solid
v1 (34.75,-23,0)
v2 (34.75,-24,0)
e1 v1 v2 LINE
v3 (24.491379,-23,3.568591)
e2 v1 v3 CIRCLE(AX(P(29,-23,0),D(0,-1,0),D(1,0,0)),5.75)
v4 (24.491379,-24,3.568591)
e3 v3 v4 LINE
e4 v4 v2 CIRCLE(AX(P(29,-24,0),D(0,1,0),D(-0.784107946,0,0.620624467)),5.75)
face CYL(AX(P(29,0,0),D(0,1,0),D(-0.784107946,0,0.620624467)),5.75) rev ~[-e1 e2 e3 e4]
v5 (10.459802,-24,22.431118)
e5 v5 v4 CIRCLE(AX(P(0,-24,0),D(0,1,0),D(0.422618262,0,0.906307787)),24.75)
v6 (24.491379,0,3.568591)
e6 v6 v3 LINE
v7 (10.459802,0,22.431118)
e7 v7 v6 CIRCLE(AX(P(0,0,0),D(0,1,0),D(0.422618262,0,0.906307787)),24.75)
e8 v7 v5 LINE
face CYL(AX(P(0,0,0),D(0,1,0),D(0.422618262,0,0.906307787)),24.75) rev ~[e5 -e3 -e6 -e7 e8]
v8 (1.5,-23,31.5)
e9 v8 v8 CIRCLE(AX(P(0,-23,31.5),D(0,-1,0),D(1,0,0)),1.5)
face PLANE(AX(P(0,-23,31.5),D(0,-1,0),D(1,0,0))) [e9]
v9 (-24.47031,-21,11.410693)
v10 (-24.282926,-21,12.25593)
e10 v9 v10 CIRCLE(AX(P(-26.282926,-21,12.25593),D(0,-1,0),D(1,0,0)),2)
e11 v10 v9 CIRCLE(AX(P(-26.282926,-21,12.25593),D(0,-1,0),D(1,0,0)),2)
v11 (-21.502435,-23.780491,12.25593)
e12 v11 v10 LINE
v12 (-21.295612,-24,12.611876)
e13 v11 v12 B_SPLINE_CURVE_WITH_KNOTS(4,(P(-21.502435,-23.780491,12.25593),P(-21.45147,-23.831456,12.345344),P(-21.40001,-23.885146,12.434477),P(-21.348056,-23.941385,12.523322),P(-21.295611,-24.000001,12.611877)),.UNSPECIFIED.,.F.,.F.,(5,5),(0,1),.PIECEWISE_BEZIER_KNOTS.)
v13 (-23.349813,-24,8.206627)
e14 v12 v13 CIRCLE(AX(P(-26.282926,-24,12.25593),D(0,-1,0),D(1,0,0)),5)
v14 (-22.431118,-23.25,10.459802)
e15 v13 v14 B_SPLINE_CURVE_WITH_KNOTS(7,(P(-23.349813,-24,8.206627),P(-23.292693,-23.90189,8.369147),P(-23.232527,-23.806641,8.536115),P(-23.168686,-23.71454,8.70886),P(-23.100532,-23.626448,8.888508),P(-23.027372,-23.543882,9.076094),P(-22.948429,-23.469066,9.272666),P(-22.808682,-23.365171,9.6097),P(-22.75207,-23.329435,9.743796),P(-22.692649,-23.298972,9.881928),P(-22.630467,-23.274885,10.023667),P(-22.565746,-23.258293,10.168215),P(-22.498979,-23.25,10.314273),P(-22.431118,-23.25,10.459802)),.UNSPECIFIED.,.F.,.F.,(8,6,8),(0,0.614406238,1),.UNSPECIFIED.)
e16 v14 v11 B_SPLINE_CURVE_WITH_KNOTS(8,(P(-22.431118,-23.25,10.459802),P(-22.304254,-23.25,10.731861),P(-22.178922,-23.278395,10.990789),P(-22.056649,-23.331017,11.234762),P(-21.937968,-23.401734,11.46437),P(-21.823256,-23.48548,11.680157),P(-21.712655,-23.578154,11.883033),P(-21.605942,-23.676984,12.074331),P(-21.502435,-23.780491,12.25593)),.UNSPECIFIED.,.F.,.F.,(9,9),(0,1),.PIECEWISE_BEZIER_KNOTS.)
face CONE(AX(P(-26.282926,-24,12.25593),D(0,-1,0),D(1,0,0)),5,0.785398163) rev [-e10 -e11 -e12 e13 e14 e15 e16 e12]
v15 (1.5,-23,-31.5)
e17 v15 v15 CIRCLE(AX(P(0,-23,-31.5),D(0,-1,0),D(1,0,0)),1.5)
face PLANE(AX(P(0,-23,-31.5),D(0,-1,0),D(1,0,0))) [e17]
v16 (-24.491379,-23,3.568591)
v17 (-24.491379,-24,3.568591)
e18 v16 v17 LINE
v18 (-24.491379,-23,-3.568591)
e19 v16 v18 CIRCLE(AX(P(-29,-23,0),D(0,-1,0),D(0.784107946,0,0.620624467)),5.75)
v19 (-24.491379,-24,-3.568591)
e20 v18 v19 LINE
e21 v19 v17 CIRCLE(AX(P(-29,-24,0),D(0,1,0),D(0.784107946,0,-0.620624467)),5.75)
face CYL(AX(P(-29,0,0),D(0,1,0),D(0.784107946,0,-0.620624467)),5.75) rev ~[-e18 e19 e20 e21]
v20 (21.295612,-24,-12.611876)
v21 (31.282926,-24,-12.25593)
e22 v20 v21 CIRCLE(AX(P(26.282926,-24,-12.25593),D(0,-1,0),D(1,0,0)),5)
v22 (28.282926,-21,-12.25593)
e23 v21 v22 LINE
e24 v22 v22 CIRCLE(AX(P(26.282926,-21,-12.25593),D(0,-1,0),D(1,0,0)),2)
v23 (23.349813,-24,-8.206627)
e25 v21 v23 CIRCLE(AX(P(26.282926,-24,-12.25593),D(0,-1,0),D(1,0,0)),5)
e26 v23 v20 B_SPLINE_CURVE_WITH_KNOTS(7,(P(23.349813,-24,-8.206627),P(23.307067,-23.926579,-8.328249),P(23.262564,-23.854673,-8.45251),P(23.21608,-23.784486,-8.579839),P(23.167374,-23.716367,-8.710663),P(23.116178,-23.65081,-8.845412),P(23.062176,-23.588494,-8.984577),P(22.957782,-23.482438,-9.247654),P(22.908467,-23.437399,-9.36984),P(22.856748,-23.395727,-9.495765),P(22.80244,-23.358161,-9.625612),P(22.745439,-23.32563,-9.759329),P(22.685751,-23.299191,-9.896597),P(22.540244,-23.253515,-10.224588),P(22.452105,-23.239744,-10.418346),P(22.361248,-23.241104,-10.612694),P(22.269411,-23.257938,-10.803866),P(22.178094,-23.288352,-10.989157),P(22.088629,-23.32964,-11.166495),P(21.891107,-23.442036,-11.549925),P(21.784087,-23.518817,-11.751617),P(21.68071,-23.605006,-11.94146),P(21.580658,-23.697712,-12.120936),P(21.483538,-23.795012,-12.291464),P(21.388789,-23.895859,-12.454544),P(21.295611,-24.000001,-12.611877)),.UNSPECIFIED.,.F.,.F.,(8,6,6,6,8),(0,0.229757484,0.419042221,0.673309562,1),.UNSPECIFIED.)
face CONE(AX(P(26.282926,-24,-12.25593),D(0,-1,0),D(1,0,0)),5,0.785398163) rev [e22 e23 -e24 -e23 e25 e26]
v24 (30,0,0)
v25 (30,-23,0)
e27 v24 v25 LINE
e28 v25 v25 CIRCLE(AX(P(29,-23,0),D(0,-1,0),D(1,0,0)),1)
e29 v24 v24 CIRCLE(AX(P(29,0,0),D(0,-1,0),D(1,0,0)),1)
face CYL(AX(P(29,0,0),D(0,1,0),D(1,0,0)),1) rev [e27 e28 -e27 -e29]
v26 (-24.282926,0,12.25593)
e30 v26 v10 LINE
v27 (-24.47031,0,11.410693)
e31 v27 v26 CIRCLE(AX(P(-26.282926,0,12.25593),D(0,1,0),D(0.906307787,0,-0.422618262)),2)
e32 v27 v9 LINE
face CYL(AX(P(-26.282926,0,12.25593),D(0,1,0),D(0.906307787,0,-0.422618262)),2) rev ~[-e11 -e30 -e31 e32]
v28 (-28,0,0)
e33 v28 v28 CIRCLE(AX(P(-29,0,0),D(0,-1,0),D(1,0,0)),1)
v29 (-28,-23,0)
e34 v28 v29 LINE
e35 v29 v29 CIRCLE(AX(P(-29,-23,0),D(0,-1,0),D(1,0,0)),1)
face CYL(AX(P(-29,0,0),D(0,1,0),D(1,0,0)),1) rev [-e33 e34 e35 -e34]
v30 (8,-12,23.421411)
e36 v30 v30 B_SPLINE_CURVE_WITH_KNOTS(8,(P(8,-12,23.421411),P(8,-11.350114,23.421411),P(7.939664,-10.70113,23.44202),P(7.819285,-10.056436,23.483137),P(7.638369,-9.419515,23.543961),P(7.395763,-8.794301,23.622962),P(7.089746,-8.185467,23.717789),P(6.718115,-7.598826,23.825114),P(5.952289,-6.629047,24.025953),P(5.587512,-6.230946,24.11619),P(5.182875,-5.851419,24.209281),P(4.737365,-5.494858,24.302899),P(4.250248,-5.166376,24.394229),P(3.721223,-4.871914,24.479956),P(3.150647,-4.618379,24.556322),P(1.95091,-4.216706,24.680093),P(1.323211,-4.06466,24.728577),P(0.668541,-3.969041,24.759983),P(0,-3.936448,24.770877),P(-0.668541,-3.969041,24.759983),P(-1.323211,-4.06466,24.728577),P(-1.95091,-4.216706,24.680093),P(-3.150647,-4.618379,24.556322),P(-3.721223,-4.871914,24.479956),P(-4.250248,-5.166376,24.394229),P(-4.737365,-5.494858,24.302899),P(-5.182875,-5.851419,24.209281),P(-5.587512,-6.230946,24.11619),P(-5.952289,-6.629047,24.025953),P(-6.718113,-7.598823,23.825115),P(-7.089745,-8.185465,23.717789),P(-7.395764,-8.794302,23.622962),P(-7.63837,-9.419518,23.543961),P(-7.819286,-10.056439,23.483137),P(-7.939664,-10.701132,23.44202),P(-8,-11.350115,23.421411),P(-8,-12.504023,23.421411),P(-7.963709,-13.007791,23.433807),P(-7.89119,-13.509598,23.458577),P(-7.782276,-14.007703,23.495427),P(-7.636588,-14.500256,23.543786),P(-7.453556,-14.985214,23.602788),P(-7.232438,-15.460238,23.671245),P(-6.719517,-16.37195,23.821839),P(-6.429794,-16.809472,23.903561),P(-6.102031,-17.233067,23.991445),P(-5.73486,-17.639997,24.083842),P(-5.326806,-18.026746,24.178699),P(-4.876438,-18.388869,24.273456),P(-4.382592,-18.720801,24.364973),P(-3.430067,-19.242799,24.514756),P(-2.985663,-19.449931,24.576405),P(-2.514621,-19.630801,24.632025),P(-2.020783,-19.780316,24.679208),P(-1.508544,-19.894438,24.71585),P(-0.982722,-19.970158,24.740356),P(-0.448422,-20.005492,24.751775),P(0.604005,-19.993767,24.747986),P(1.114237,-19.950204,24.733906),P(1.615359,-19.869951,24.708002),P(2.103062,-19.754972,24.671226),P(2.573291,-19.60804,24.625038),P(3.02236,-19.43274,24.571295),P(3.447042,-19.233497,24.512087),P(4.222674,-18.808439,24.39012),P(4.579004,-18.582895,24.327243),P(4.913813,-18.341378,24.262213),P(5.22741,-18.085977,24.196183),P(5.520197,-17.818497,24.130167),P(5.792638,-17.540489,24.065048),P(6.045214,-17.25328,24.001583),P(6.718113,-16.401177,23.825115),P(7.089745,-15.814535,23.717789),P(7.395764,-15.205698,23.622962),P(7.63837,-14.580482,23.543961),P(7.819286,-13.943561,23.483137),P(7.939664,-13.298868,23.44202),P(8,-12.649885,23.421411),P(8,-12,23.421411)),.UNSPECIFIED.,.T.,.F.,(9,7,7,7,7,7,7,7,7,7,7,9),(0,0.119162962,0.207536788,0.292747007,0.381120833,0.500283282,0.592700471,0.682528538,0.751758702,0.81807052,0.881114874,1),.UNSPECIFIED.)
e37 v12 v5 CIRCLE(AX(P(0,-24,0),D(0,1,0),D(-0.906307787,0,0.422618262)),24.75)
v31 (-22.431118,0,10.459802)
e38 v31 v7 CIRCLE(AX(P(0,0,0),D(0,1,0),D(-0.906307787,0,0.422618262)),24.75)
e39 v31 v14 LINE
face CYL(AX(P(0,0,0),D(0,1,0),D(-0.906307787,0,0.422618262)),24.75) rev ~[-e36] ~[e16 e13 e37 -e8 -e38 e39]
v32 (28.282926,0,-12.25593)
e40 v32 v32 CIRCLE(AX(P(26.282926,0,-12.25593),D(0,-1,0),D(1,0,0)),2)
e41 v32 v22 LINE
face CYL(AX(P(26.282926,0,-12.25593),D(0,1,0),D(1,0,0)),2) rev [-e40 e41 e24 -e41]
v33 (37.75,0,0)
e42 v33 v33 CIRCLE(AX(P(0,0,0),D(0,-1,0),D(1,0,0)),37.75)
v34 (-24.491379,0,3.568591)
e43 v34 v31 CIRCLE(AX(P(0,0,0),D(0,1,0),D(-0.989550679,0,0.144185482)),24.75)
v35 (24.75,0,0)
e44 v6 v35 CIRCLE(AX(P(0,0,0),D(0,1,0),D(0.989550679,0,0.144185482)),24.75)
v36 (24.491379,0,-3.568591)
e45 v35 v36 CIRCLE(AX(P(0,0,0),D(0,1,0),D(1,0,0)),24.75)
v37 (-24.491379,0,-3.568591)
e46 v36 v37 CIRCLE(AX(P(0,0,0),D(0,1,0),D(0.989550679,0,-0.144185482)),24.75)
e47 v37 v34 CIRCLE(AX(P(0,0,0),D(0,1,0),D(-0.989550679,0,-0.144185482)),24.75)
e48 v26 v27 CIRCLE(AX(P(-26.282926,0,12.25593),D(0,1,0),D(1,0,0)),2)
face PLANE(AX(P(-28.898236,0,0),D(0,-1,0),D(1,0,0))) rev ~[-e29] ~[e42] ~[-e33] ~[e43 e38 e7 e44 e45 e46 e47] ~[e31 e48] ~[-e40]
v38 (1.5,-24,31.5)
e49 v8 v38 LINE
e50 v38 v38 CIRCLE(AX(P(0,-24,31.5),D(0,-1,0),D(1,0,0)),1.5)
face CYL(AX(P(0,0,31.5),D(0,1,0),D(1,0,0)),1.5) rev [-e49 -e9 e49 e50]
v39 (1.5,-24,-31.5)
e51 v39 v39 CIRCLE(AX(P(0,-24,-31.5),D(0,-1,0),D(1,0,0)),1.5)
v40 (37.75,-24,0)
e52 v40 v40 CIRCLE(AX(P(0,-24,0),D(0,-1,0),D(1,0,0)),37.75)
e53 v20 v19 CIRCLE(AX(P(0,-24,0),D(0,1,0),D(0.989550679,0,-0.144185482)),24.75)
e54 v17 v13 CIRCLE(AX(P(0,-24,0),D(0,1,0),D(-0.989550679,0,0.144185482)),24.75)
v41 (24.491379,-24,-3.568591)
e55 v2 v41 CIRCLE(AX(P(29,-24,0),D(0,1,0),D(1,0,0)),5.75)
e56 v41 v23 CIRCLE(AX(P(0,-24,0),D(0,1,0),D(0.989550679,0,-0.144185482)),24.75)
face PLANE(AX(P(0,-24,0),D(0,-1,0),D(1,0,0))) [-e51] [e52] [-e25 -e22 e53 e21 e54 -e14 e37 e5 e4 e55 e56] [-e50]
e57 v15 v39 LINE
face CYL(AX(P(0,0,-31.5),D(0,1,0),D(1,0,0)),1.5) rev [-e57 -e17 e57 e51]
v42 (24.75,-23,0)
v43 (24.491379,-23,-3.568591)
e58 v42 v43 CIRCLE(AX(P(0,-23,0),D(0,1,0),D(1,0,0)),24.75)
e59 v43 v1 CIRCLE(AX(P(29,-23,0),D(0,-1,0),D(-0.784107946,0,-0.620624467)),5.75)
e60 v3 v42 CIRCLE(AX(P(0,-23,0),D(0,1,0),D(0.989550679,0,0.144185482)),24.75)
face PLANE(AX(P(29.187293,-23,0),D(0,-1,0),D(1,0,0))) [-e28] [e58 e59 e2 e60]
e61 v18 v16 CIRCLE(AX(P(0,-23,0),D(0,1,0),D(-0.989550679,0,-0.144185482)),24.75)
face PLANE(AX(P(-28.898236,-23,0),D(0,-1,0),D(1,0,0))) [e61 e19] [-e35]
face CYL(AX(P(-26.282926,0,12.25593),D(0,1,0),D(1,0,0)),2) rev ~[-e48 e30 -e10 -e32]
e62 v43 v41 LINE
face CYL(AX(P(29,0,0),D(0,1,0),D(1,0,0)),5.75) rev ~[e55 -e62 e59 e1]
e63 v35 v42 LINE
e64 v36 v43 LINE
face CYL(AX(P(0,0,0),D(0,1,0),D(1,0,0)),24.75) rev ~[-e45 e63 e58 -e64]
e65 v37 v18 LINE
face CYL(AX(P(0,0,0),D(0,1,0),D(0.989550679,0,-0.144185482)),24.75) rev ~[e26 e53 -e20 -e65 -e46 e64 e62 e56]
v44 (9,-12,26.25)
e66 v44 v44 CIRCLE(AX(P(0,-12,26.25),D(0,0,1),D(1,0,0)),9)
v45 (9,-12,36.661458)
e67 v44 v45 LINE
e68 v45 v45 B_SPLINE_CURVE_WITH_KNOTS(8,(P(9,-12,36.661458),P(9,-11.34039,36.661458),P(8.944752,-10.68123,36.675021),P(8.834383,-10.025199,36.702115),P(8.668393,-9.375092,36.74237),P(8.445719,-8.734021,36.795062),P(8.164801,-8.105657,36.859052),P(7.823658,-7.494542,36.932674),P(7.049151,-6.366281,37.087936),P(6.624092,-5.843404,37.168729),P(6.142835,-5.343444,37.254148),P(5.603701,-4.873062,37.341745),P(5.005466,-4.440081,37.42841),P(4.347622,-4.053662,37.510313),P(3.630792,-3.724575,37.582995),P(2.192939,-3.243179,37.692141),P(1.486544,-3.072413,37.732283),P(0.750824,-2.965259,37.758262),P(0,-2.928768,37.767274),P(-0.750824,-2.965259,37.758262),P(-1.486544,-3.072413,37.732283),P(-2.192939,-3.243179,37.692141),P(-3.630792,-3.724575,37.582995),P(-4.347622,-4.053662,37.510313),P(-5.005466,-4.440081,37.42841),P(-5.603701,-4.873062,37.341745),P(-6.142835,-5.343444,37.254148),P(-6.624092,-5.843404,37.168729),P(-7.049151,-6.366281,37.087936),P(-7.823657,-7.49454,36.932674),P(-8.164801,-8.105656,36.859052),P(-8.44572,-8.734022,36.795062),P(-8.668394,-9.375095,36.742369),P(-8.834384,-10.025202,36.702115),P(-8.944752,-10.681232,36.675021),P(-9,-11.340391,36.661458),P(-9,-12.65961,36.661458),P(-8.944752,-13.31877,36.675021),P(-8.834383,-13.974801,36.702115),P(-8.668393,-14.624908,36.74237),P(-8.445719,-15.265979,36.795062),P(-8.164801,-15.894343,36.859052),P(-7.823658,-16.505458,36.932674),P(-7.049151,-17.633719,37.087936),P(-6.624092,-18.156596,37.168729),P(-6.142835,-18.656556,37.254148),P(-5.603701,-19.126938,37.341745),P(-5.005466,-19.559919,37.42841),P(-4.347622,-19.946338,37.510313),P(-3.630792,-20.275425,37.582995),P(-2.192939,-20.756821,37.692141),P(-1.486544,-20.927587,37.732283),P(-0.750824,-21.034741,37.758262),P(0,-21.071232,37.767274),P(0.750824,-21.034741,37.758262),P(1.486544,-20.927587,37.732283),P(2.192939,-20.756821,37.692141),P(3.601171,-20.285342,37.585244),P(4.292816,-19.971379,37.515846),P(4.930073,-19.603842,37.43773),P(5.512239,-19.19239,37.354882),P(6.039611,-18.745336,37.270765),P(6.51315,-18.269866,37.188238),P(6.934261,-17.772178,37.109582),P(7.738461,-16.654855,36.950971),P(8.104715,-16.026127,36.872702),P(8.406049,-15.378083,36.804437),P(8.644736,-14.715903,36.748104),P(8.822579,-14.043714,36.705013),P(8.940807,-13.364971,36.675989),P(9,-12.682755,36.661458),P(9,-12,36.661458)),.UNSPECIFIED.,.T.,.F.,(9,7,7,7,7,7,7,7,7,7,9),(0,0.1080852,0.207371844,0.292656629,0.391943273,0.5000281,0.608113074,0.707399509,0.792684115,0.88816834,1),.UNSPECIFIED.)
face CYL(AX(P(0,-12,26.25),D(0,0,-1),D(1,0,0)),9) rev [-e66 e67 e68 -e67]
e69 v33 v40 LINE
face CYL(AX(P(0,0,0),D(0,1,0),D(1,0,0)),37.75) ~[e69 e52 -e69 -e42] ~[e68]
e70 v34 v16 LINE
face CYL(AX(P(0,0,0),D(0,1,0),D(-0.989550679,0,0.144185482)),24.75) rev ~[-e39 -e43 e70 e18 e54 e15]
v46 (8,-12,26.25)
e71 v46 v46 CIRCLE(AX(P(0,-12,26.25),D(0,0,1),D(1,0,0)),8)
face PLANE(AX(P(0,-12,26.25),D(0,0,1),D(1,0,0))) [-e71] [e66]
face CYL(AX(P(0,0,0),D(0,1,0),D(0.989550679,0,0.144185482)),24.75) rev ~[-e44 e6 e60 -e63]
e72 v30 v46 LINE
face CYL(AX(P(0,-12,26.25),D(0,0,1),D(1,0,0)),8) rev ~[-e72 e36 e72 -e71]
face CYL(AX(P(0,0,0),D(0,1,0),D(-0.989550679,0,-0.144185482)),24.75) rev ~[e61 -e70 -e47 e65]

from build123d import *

# Parameters (mm, degrees)
F0_R     = 37.75
F0_R_2   = 1.5
F0_R_3   = 2
F1_DEPTH = 24
F0_R_4   = 1
F2_DEPTH = 23
F5_R     = 9
F5_R_2   = 8
F6_DEPTH = 25
F7_DEPTH = 15


# Not quite as in the source:
# - a fillet or chamfer that OpenCascade refuses, or shapes differently, is made with other operations: its cross-section is extruded or revolved along the edge and cut away or added


with BuildPart() as f1:
    # F0 (on Front) → F1 (new body)
    with BuildSketch(Plane.XZ):
        Circle(F0_R)
        with Locations((0, -31.5)):
            Circle(F0_R_2, mode=Mode.SUBTRACT)
        with Locations((26.2829258241, -12.2559295905)):
            Circle(F0_R_3, mode=Mode.SUBTRACT)
        with BuildLine():
            ThreePointArc((-24.2829258241, 12.2559295905), (-24.3303338098, 11.8230503626), (-24.47031025, 11.410693067))
            ThreePointArc((-24.47031025, 11.410693067), (-28.2355178383, 12.6888088184), (-24.2829258241, 12.2559295905))
        make_face(mode=Mode.SUBTRACT)
        with BuildLine():
            ThreePointArc((10.4598019781, 22.4311177292), (19.8581217638, 14.7721867038), (24.4913793103, 3.568590685))
            ThreePointArc((24.4913793103, 3.568590685), (30.8891705898, 5.4307950139), (34.75, 0))
            ThreePointArc((34.75, 0), (30.8891705898, -5.4307950139), (24.4913793103, -3.568590685))
            ThreePointArc((24.4913793103, -3.568590685), (0, -24.75), (-24.4913793103, -3.568590685))
            ThreePointArc((-24.4913793103, -3.568590685), (-34.75, 0), (-24.4913793103, 3.568590685))
            ThreePointArc((-24.4913793103, 3.568590685), (-23.7129158978, 7.0894371866), (-22.4311177292, 10.4598019781))
            ThreePointArc((-22.4311177292, 10.4598019781), (-8.4649985473, 23.2573923645), (10.4598019781, 22.4311177292))
        make_face(mode=Mode.SUBTRACT)
        with Locations((0, 31.5)):
            Circle(F0_R_2, mode=Mode.SUBTRACT)
    extrude(amount=F1_DEPTH)

    # F0 (on Front) → F2 (join)
    with BuildSketch(Plane.XZ):
        with BuildLine():
            ThreePointArc((-24.4913793103, 3.568590685), (-34.75, 0), (-24.4913793103, -3.568590685))
            ThreePointArc((-24.4913793103, -3.568590685), (-24.75, 0), (-24.4913793103, 3.568590685))
        make_face()
        with Locations((-29, 0)):
            Circle(F0_R_4, mode=Mode.SUBTRACT)
        with Locations((0, 31.5)):
            Circle(F0_R_2)
        with BuildLine():
            ThreePointArc((24.4913793103, 3.568590685), (24.6852601559, 1.7889748557), (24.75, 0))
            ThreePointArc((24.75, 0), (24.6852601559, -1.7889748557), (24.4913793103, -3.568590685))
            ThreePointArc((24.4913793103, -3.568590685), (30.8891705898, -5.4307950139), (34.75, 0))
            ThreePointArc((34.75, 0), (30.8891705898, 5.4307950139), (24.4913793103, 3.568590685))
        make_face()
        with Locations((29, 0)):
            Circle(F0_R_4, mode=Mode.SUBTRACT)
        with Locations((0, -31.5)):
            Circle(F0_R_2)
    extrude(amount=F2_DEPTH)

    # F3: chamfer of 3 on 2 edges, made by hand

    # F3_s1 → F3_t2 (revolve, cut)
    with BuildSketch(Plane.XY.offset(12.2559295905)):
        Polygon((-21.2829258241, -24), (-24.2829258241, -21), (-24.2829258241, -24), align=None)
    revolve(axis=Axis((-26.2829258241, -24, 12.2559295905), (0, -1, 0)), mode=Mode.SUBTRACT)

    # F3_s3 → F3_t4 (revolve, cut)
    with BuildSketch(Plane.XY.offset(-12.2559295905)):
        Polygon((31.2829258241, -24), (28.2829258241, -21), (28.2829258241, -24), align=None)
    revolve(axis=Axis((26.2829258241, -24, -12.2559295905), (0, -1, 0)), mode=Mode.SUBTRACT)

    # F5 (on offset) → F6 (cut)
    with BuildSketch(Plane.XY.offset(26.25)):
        with Locations((0, -12)):
            Circle(F5_R)
        with Locations((0, -12)):
            Circle(F5_R_2, mode=Mode.SUBTRACT)
    extrude(amount=F6_DEPTH, mode=Mode.SUBTRACT)

    # F5 (on offset) → F7 (cut, symmetric)
    with BuildSketch(Plane.XY.offset(26.25)):
        with Locations((0, -12)):
            Circle(F5_R_2)
    extrude(amount=F7_DEPTH, both=True, mode=Mode.SUBTRACT)


solid = f1.part
